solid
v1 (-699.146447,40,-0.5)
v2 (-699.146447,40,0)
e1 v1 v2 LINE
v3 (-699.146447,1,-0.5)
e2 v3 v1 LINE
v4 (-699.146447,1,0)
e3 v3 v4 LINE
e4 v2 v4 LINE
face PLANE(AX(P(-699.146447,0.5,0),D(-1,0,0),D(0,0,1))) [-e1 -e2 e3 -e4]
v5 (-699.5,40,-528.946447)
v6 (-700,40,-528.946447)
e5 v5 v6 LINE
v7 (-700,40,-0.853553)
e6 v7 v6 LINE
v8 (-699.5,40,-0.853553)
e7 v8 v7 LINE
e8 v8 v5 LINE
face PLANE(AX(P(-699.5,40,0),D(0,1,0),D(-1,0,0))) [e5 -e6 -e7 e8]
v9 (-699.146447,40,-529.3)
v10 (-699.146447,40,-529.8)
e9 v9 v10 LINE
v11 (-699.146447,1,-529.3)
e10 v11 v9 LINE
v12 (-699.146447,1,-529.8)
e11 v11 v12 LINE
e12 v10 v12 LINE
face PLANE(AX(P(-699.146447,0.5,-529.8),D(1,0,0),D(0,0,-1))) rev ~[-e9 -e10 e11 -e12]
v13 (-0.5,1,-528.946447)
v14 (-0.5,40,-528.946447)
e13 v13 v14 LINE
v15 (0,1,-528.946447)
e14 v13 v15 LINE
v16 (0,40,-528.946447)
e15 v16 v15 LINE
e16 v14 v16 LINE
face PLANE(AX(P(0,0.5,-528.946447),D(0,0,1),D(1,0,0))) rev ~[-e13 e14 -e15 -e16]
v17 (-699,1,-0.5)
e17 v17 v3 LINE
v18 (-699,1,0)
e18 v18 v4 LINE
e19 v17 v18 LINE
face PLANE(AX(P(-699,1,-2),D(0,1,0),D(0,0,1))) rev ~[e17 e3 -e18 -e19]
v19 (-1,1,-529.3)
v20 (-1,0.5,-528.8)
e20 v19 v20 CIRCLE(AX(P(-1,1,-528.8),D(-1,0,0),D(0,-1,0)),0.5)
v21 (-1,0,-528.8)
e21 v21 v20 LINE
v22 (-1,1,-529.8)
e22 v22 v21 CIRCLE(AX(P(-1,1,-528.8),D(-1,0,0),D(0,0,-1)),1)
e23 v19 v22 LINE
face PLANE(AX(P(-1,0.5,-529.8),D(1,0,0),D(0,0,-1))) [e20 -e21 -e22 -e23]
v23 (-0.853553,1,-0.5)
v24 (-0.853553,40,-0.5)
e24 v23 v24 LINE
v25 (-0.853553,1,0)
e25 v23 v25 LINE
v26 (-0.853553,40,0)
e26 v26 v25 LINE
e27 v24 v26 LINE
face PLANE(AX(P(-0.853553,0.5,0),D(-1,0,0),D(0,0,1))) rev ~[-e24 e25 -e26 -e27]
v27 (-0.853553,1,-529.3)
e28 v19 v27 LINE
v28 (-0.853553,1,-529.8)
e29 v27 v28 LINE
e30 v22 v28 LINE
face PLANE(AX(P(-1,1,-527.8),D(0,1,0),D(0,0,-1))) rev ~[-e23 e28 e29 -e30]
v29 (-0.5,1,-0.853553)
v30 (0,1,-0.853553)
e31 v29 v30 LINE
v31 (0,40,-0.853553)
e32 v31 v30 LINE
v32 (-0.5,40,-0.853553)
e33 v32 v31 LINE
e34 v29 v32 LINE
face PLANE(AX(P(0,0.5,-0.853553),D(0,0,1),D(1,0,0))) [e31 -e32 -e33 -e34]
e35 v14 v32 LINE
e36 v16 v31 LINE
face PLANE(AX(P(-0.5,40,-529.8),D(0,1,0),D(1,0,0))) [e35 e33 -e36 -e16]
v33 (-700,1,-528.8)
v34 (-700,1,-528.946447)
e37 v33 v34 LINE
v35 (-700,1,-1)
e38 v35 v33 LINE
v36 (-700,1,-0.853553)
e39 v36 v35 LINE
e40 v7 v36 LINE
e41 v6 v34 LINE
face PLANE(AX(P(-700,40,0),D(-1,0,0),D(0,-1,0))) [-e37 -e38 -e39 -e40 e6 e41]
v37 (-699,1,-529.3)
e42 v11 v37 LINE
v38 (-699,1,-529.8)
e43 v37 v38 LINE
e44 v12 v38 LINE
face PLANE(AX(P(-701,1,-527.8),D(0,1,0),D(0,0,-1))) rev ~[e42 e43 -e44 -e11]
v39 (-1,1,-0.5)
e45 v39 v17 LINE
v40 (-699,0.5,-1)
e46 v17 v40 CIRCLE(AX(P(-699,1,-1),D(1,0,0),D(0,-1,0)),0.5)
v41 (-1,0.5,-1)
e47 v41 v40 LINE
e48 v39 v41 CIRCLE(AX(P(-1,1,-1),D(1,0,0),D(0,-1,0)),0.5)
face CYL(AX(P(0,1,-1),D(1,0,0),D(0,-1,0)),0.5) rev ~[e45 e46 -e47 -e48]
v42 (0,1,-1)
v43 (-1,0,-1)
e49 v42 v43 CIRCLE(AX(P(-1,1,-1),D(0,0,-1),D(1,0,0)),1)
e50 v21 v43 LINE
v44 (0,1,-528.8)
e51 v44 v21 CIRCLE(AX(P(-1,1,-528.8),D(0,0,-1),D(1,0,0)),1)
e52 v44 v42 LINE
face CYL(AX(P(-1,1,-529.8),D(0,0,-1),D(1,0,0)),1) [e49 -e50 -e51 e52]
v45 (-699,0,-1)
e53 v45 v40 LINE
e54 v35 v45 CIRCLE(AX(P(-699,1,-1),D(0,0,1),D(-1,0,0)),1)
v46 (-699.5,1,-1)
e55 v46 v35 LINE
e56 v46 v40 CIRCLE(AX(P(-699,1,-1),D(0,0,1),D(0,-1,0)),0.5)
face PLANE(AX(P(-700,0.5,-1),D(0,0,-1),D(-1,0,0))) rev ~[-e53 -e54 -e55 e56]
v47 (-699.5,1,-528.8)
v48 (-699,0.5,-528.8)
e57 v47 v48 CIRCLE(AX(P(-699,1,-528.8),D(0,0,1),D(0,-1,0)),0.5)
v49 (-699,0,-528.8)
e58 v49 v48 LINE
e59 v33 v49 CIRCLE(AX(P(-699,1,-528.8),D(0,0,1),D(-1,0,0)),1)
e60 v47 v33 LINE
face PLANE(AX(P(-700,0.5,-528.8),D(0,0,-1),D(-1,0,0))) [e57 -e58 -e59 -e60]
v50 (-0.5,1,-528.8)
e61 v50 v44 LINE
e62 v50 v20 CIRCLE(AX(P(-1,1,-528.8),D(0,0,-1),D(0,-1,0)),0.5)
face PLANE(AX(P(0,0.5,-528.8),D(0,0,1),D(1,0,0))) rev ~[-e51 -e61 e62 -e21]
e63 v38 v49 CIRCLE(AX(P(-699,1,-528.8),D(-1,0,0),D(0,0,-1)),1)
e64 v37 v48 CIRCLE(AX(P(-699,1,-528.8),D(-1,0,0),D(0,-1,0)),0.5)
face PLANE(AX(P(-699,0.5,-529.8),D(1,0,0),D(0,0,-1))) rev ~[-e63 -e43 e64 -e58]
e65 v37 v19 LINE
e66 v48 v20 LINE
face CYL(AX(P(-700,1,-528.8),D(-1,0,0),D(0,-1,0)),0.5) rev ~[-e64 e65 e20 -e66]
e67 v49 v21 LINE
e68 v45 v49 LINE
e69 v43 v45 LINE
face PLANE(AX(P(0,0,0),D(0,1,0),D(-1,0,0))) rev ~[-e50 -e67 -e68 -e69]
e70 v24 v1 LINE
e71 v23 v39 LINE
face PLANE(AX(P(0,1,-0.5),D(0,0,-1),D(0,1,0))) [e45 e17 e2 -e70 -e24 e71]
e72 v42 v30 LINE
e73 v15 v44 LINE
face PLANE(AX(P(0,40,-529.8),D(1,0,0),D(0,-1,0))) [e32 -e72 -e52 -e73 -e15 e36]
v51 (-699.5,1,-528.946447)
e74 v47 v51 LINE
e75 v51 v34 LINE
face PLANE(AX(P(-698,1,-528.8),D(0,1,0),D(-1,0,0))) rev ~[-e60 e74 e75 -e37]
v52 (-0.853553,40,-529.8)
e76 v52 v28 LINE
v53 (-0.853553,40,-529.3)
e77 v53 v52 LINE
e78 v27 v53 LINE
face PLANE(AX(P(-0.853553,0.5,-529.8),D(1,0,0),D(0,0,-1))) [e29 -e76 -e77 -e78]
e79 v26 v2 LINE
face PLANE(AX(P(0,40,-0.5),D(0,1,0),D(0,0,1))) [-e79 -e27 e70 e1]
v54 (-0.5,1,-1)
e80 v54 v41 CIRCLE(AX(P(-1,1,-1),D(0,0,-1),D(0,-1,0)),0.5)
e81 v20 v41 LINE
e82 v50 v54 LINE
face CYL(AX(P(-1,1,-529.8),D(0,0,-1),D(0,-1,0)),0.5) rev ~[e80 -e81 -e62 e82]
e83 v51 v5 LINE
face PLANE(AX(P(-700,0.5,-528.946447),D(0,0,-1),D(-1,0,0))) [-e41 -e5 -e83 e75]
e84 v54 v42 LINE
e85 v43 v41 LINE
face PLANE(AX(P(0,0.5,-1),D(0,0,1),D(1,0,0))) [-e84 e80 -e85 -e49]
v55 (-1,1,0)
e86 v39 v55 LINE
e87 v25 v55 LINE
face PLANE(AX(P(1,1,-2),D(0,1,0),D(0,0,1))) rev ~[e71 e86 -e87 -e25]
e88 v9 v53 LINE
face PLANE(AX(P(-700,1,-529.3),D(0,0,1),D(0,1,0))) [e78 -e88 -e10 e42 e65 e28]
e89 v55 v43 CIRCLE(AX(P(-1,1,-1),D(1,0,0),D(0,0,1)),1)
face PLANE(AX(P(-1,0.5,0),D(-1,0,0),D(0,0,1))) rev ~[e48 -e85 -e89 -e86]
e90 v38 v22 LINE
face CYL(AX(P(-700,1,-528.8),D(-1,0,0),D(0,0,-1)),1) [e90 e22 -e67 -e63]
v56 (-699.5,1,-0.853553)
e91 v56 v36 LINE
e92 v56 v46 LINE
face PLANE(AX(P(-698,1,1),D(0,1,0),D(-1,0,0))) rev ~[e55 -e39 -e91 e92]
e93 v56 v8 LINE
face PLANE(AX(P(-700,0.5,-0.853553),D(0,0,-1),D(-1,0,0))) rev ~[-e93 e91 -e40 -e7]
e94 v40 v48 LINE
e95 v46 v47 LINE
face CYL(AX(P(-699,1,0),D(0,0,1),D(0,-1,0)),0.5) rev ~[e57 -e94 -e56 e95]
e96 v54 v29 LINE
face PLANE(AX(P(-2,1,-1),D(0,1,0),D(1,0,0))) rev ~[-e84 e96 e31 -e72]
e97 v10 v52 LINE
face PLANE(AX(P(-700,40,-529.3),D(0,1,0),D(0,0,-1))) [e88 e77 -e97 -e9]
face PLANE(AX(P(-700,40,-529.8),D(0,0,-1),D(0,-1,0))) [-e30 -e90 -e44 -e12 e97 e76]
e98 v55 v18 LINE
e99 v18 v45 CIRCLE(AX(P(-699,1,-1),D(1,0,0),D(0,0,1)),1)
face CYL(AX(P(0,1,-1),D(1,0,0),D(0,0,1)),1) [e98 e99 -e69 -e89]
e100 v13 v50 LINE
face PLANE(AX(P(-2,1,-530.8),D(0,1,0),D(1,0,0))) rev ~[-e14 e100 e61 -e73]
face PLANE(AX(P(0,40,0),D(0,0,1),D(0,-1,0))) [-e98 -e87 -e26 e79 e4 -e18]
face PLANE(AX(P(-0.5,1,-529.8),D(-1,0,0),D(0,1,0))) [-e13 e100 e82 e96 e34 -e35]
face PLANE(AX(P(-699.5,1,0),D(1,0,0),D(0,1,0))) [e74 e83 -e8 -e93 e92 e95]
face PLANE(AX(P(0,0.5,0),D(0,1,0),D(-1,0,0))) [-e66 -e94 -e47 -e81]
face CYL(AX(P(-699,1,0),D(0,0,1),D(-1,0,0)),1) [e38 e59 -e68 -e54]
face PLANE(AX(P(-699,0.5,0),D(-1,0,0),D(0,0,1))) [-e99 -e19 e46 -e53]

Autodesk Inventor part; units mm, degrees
ref_plane "YZ Plane" through (0, 0, 0) normal (1, 0, 0) x (0, 1, 0)
ref_plane "XZ Plane" through (0, 0, 0) normal (0, 1, 0) x (-1, 0, 0)
ref_plane "XY Plane" through (0, 0, 0) normal (0, 0, 1) x (1, 0, 0)
sketch "Sketch1" plane through (0, 0, 0) normal (0, 1, 0) x (-1, 0, 0)
  line L0 (0, 0) -> (700, 0)
  line L1 (700, 0) -> (700, -529.8)
  line L2 (700, -529.8) -> (0, -529.8)
  line L3 (0, -529.8) -> (0, 0)
  dimension "d0" = 700
  dimension "d1" = 529.8
extrude "Plate1" add sketch "Sketch1" along normal blind 0.5
sketch "Sketch2" plane through (-700, 0, -529.3) normal (0, 0, -1) x (-1, 0, 0)
  line L0 (-700, 0) -> (0, 0)
  line L1 (0, 0) -> (0, 40)
  line L2 (0, 40) -> (-700, 40)
  line L3 (-700, 40) -> (-700, 0)
edge flange "Flange1" height 40 angle 90 thickness 0.5 bend radius 0.5 thickness toward (0, 0, -1) relief tear relief width 0.5 relief depth 0.25 corner gap 0.5 corner form 2 edges at (-350, 0.5, -529.8) (0, 0.5, -264.9) (-350, 0.5, 0) (-700, 0.5, -264.9) wall of the first edge with corners at (0, 0, -529.3) (-700, 0, -529.3) (-700, 40, -529.3) (0, 40, -529.3)
bend "Bend1"
corner "Corner1"
equation "\"d3\" = BendReliefWidth"
equation "\"d4\" = BendReliefDepth"
equation "\"d5\" = MinimumRemnant"
equation "\"d6\" = BendRadius"
equation "\"d9\" = BendRadius"
equation "\"d10\" = CornerReliefSize"
equation "\"d11\" = GapSize"
equation "\"d12\" = JacobiRadiusSize"
equation "\"BendRadius\" = Thickness"
equation "\"BendReliefWidth\" = Thickness"
equation "\"BendReliefDepth\" = 0.5 * Thickness"
equation "\"CornerReliefSize\" = 4 * Thickness"
equation "\"MinimumRemnant\" = 2 * Thickness"
equation "\"TransitionRadius\" = BendRadius"
equation "\"JacobiRadiusSize\" = BendRadius"
equation "\"GapSize\" = Thickness"
equation "\"d2\" = BendRadius"
equation "\"Thickness\" = 0.5"
properties part number "BeddingStopper"
